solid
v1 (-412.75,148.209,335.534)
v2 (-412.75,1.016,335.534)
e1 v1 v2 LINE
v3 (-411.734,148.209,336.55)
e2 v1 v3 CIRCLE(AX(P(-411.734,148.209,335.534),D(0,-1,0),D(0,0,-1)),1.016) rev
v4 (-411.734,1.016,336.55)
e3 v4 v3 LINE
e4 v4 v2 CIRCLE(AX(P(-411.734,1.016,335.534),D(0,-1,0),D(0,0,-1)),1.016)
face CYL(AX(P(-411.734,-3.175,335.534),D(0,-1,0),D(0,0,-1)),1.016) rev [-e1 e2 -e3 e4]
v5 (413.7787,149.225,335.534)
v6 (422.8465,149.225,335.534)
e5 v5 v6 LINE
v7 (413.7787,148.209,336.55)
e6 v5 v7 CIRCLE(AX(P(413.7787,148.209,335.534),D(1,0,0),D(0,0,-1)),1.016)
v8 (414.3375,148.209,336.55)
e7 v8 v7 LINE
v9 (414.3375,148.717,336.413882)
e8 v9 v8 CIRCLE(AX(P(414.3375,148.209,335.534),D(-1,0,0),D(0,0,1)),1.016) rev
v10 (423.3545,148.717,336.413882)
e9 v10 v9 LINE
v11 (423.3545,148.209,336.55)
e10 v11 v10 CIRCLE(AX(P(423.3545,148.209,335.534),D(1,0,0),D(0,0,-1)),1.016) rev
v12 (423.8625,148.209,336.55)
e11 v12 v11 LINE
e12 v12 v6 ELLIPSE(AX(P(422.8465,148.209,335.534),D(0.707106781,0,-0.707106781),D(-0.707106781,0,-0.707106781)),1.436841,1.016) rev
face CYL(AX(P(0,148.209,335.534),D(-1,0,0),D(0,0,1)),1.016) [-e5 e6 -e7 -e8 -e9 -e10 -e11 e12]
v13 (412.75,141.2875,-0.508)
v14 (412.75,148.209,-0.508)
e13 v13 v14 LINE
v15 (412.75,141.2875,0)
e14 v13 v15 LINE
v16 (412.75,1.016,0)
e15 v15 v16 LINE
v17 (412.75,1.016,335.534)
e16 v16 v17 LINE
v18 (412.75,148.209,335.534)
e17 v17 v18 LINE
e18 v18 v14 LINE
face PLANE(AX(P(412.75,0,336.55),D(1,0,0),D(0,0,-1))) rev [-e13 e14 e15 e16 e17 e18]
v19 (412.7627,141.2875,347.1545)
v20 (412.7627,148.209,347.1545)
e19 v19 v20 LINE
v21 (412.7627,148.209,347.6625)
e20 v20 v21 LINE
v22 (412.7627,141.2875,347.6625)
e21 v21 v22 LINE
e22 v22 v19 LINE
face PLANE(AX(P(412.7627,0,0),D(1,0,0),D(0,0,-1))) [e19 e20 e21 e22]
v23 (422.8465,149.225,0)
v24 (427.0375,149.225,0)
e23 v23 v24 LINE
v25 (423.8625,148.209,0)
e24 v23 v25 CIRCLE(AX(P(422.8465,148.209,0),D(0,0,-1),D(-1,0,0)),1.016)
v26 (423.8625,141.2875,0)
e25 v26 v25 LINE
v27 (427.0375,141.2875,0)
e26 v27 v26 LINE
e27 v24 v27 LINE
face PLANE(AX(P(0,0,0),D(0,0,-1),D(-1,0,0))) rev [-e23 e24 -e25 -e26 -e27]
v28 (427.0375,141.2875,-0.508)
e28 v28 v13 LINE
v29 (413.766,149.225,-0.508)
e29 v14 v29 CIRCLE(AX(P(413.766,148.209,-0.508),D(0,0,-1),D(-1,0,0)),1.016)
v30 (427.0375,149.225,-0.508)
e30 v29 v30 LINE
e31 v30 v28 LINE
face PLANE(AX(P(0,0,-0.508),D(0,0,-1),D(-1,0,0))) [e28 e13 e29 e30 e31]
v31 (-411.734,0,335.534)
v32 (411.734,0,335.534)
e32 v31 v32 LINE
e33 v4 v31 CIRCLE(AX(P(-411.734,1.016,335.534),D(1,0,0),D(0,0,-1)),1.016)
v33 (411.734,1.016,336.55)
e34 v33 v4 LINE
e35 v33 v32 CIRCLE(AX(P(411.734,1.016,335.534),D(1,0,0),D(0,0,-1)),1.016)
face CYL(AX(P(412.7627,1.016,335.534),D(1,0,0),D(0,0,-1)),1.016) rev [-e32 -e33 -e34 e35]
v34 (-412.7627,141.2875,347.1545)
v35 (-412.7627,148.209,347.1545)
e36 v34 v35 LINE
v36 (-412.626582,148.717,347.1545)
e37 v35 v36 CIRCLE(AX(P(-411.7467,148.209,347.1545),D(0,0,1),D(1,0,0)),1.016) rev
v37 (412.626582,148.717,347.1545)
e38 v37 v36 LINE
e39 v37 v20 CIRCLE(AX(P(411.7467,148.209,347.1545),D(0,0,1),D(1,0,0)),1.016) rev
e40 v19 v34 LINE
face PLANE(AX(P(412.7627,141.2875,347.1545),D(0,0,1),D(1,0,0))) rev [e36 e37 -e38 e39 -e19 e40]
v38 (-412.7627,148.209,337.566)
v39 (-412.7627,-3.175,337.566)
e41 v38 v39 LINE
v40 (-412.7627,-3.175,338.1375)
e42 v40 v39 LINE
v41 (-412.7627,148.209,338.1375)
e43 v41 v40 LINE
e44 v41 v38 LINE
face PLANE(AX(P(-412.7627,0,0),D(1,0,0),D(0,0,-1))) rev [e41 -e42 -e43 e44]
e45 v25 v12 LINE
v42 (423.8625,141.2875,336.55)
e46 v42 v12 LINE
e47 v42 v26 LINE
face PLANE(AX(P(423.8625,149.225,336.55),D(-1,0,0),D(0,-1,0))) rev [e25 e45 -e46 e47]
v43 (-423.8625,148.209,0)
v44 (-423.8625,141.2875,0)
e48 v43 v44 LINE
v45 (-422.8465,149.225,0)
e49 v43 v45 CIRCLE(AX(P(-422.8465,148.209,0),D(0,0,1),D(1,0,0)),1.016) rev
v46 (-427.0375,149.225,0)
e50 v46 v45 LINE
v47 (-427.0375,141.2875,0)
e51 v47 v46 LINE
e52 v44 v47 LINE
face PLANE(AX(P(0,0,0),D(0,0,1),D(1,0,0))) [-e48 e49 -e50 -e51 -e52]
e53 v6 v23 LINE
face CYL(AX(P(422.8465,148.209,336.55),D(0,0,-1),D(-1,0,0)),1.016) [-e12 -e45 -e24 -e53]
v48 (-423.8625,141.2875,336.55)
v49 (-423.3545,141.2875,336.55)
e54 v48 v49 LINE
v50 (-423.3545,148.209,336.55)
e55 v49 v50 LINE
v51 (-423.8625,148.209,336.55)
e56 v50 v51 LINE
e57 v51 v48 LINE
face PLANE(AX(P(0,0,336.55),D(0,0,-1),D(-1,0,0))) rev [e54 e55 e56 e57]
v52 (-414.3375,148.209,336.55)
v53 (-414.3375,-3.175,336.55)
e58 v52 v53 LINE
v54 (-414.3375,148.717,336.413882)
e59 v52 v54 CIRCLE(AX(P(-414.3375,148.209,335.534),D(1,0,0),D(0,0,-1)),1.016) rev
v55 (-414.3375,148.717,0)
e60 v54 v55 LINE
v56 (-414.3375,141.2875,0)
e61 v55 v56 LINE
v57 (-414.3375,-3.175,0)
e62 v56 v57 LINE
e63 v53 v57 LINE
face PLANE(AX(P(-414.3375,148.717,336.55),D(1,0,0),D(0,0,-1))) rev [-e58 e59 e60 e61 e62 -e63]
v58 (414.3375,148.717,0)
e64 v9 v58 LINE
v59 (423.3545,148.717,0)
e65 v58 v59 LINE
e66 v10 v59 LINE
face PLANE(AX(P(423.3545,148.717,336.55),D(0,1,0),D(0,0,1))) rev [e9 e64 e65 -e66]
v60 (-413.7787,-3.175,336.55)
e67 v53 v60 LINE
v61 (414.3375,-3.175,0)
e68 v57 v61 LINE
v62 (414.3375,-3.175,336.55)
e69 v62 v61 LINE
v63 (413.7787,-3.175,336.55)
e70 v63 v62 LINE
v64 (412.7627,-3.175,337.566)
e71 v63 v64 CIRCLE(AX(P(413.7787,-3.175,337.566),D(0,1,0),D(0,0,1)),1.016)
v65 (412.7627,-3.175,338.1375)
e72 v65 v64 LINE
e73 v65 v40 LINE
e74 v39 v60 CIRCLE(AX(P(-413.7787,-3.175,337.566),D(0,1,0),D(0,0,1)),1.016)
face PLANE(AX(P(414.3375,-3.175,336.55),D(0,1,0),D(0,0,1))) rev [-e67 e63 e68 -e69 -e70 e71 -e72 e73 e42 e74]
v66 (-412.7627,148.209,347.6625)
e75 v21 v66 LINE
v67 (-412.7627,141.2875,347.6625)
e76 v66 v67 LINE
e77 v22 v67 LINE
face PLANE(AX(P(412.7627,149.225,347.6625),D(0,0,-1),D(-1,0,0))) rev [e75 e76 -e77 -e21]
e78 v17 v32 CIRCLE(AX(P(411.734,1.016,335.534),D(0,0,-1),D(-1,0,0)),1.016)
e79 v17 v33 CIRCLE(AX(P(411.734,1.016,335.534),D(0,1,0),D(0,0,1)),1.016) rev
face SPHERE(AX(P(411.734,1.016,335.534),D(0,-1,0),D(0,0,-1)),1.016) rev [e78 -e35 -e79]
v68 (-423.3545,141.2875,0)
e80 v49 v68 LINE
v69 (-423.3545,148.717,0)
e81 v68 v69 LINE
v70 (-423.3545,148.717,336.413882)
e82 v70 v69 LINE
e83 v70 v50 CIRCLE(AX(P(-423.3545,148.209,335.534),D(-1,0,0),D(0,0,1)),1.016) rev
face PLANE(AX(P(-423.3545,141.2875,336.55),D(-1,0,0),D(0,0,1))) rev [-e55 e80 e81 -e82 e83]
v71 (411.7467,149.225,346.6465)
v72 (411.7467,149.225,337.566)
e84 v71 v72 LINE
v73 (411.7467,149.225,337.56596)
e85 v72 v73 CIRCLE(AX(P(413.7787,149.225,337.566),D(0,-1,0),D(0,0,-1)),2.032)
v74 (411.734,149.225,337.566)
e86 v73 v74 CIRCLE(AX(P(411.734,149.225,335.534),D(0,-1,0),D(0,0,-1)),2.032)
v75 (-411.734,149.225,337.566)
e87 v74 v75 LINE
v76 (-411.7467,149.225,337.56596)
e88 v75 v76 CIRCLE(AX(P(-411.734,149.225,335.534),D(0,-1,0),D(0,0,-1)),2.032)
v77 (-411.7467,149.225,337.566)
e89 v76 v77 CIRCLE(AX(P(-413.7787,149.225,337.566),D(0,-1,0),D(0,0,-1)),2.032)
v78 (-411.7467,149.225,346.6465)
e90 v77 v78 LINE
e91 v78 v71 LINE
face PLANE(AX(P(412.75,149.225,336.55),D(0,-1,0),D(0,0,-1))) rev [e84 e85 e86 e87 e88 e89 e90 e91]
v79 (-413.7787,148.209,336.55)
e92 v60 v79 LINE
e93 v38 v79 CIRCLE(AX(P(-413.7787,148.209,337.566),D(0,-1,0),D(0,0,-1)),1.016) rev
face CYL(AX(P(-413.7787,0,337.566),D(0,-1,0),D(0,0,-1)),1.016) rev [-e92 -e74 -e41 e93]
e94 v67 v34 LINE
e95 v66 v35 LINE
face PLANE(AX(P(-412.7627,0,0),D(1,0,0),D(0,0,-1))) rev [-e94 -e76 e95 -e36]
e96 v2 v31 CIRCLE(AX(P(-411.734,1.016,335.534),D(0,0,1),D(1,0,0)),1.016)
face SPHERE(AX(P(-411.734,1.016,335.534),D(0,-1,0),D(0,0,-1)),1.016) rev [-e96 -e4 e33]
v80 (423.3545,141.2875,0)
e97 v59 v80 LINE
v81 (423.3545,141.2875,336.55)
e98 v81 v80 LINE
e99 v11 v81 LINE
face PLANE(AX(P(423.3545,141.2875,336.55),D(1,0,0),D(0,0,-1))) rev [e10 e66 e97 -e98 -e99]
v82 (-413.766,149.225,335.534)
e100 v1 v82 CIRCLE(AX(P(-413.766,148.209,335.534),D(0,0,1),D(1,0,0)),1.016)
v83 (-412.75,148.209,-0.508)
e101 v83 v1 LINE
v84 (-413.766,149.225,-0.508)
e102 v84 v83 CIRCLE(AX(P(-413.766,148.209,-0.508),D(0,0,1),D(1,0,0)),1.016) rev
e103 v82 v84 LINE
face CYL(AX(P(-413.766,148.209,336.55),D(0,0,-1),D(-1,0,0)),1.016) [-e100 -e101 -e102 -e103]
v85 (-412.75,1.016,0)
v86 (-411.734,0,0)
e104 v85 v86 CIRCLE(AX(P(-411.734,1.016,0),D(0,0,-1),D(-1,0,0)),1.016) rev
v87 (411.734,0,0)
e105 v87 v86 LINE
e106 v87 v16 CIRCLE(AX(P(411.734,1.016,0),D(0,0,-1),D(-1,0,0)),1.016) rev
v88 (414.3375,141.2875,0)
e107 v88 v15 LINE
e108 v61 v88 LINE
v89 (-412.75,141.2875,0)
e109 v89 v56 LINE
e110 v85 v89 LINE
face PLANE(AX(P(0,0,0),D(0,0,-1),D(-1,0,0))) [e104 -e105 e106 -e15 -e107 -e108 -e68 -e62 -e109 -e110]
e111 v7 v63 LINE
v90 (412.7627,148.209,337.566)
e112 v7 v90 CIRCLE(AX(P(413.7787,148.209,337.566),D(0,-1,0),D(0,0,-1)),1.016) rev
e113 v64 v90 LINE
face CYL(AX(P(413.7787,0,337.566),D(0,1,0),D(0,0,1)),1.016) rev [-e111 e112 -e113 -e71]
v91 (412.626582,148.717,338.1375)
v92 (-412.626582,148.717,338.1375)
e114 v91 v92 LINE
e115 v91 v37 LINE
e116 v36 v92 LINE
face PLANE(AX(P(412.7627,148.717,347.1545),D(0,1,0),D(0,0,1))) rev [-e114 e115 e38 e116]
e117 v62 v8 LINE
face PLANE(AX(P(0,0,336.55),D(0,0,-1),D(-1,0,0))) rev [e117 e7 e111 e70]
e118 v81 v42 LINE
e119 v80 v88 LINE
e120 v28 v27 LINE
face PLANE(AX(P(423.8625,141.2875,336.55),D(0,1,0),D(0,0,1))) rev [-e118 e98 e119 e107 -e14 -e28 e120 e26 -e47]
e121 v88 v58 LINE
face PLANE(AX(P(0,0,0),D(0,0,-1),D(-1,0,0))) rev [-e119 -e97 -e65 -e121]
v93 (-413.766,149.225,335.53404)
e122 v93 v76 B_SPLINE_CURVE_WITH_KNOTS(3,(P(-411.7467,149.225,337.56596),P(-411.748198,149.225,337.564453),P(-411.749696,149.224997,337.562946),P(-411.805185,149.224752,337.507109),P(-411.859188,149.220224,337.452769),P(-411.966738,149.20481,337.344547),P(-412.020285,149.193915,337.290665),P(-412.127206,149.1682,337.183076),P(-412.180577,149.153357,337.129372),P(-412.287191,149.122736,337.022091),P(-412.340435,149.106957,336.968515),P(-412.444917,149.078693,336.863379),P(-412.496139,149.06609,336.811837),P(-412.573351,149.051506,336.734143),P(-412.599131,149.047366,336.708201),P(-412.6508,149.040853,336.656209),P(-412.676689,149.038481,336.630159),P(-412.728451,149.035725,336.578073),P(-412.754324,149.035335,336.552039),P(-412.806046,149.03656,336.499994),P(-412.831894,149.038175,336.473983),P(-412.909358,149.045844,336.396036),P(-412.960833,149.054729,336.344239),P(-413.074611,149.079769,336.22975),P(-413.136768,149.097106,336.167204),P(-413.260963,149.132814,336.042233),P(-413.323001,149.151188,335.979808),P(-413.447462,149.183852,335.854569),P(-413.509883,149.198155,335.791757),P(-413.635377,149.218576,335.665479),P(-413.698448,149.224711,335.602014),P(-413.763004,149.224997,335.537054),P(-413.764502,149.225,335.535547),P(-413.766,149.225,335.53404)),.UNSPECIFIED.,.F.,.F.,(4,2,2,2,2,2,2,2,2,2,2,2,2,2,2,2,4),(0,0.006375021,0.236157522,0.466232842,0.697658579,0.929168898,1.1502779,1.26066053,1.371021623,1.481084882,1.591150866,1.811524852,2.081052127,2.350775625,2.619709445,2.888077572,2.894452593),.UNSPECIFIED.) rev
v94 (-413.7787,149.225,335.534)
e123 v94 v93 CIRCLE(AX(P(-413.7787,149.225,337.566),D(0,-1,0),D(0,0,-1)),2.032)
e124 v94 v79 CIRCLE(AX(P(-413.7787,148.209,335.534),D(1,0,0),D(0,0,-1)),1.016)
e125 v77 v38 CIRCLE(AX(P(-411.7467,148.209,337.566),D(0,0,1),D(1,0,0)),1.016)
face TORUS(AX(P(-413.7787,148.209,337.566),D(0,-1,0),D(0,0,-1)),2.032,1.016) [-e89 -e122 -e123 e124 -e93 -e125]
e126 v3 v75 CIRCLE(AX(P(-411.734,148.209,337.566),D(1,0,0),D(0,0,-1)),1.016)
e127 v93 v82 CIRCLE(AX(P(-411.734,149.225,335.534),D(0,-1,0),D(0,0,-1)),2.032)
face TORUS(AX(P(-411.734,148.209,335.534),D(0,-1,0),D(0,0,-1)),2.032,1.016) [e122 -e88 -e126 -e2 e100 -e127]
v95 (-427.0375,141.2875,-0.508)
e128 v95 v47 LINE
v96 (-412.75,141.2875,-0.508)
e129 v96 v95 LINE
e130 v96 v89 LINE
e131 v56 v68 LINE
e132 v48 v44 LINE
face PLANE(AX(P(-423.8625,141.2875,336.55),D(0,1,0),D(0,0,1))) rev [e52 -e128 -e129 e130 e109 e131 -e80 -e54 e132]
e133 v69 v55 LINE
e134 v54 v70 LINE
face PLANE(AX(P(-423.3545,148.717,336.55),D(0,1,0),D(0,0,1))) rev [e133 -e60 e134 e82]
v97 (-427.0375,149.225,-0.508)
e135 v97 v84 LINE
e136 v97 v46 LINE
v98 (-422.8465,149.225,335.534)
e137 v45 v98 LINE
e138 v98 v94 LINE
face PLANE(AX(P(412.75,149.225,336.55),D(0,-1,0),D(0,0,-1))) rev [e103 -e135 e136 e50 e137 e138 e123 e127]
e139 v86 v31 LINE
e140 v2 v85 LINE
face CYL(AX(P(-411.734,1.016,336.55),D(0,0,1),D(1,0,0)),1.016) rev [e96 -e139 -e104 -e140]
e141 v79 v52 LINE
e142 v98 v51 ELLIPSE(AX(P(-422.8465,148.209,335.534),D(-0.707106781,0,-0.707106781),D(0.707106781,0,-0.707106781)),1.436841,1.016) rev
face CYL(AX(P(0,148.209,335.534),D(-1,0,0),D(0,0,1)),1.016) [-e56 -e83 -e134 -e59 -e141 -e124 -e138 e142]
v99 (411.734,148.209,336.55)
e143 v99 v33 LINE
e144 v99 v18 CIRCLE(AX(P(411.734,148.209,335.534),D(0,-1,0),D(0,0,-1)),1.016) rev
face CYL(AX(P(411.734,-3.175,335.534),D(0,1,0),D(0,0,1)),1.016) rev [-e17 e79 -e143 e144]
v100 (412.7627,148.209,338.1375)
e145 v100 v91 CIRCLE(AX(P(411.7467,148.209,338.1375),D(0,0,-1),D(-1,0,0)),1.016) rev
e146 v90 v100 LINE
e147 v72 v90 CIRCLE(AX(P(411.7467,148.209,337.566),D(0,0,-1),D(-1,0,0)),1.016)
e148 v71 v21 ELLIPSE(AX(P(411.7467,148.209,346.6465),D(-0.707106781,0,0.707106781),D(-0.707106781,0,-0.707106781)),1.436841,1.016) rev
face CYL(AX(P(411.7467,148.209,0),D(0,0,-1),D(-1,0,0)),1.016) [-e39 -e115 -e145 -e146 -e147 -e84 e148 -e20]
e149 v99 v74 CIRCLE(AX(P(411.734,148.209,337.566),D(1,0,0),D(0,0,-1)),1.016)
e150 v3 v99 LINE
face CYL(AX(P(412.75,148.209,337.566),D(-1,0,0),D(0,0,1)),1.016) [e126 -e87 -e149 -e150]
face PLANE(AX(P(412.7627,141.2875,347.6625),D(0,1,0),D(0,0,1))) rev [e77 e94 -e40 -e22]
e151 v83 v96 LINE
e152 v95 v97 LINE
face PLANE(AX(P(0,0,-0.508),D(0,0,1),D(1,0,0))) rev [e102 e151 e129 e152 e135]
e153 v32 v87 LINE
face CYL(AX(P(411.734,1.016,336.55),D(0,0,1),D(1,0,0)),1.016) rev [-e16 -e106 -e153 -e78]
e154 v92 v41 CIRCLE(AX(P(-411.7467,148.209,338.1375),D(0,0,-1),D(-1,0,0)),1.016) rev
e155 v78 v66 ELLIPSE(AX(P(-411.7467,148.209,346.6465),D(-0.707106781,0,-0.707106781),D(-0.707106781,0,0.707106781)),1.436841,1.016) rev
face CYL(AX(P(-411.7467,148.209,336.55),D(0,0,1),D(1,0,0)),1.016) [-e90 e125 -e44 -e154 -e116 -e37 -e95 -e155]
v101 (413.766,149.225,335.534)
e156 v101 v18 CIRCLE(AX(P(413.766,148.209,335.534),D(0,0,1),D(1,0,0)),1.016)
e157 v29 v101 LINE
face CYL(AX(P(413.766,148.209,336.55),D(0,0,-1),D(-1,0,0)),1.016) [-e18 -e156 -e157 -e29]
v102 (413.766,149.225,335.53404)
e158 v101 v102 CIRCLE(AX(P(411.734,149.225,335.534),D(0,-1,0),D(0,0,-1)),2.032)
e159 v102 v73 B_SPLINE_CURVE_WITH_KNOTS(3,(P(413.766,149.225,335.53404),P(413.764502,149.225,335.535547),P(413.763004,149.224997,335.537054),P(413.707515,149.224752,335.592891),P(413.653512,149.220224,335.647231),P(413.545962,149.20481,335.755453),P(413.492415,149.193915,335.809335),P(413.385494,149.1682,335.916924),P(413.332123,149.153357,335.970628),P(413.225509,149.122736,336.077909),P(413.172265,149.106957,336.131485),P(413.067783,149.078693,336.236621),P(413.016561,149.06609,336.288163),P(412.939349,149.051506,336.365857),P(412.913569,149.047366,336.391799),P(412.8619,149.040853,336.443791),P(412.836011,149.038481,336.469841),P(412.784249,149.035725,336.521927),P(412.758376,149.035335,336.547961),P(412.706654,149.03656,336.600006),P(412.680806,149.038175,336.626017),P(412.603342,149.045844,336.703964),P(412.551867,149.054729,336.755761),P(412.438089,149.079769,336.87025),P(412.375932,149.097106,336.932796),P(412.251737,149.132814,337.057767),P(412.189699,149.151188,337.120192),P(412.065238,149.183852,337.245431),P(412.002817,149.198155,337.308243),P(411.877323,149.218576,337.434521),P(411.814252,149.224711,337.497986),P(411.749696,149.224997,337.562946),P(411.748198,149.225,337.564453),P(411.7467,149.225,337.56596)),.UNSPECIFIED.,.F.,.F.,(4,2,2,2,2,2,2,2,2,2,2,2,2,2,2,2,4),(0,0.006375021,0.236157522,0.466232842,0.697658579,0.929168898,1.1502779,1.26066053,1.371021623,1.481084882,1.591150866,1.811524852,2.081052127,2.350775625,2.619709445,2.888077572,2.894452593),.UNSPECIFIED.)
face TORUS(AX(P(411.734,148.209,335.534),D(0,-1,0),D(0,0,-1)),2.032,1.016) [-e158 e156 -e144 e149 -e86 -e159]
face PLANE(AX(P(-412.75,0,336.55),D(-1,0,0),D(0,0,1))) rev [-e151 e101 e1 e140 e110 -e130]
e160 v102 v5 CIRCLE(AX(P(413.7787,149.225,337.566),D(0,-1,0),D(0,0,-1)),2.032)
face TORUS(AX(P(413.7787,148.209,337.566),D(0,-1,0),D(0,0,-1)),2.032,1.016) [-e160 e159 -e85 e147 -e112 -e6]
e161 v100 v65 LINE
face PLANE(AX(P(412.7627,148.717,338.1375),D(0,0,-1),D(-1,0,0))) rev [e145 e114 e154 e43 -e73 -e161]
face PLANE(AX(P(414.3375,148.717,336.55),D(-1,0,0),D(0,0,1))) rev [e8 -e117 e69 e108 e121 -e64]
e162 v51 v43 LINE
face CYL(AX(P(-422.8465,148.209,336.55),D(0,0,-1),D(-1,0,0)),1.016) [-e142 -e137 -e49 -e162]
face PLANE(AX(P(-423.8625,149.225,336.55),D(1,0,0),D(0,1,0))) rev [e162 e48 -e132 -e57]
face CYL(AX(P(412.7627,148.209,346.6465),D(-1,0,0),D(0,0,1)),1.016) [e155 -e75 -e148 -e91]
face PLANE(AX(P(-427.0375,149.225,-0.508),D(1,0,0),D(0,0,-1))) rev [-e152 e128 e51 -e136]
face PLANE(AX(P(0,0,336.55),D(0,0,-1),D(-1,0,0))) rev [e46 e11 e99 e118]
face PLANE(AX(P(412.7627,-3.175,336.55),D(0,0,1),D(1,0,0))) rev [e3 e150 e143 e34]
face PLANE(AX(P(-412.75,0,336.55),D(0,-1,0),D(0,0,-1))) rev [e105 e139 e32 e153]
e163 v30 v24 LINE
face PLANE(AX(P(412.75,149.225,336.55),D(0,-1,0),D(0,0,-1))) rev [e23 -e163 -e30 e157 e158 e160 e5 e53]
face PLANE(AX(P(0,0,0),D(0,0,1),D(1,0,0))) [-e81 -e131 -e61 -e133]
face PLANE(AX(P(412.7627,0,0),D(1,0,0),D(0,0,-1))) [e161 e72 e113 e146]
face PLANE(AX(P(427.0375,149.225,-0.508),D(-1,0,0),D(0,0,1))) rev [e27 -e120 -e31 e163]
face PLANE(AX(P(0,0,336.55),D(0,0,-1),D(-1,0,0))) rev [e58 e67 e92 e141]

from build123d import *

# Parameters (mm, degrees)
BOSS_EXTRUDE1_DEPTH = 336.55
SKETCH2_W           = 14.2875
SKETCH2_H           = 7.9375
BOSS_EXTRUDE2_DEPTH = 0.508
BOSS_EXTRUDE6_DEPTH = 412.7627
FILLET1_R           = 1.016
FILLET2_R           = 1.016
FILLET3_R           = 1.016
FILLET4_R           = 1.016
FILLET5_R           = 1.016


with BuildPart() as part:
    # Sketch1 → Boss-Extrude1 (new body)
    with BuildSketch(Plane.XY):
        Polygon((-412.75, 0), (412.75, 0), (412.75, 149.225), (423.8625, 149.225), (423.8625, 141.2875), (423.3545, 141.2875), (423.3545, 148.717), (414.3375, 148.717), (414.3375, -3.175), (-414.3375, -3.175), (-414.3375, 148.717), (-423.3545, 148.717), (-423.3545, 141.2875), (-423.8625, 141.2875), (-423.8625, 149.225), (-412.75, 149.225), align=None)
    extrude(amount=BOSS_EXTRUDE1_DEPTH)

    # Sketch2 → Boss-Extrude2 (add)
    with BuildSketch(Plane(origin=(0, 0, 0), x_dir=(-1, 0, 0), z_dir=(0, 0, -1))):
        with Locations((-419.89375, 145.25625)):
            Rectangle(SKETCH2_W, SKETCH2_H)
        with Locations((419.89375, 145.25625)):
            Rectangle(SKETCH2_W, SKETCH2_H)
    extrude(amount=BOSS_EXTRUDE2_DEPTH)

    # Sketch3 → Boss-Extrude6 (add, symmetric)
    with BuildSketch(Plane(origin=(0, 0, 0), x_dir=(0, 0, -1), z_dir=(1, 0, 0))):
        Polygon((-336.55, -3.175), (-336.55, 149.225), (-347.6625, 149.225), (-347.6625, 141.2875), (-347.1545, 141.2875), (-347.1545, 148.717), (-338.1375, 148.717), (-338.1375, -3.175), align=None)
    extrude(amount=BOSS_EXTRUDE6_DEPTH, both=True)

    # Fillet1
    fillet1_edges = [part.edges().sort_by_distance(p)[0] for p in [
        (412.75, 74.6125, 336.55),
    ]]
    fillet(fillet1_edges, radius=FILLET1_R)

    # Fillet2
    fillet2_edges = [part.edges().sort_by_distance(p)[0] for p in [
        (412.7627, 73.025, 336.55),
    ]]
    fillet(fillet2_edges, radius=FILLET2_R)

    # Fillet3
    fillet3_edges = [part.edges().sort_by_distance(p)[0] for p in [
        (-412.75, 74.6125, 336.55),
        (-412.7627, 73.025, 336.55),
    ]]
    fillet(fillet3_edges, radius=FILLET3_R)

    # Fillet4
    fillet4_edges = [part.edges().sort_by_distance(p)[0] for p in [
        (0, 0, 336.55),
        (412.75, 0, 167.767),
        (412.45242049, 0, 336.25242049),
        (-412.75, 0, 167.767),
        (-412.45242049, 0, 336.25242049),
    ]]
    fillet(fillet4_edges, radius=FILLET4_R)

    # Fillet5
    # the kernel refuses this fillet: 1.016 mm, written as the material it takes off along each edge
    with BuildSketch(Plane(origin=(413.7787, 149.225, 336.55), x_dir=(0, 0, -1), z_dir=(1, 0, 0)), Plane(origin=(-426.4025, 149.225, 336.55), x_dir=(0, 0, -1), z_dir=(1, 0, 0))) as fillet5_piece_1:
        with BuildLine():
            CenterArc((FILLET5_R, -FILLET5_R), FILLET5_R, 90, 90)
            Line((0, -FILLET5_R), (0, 0))
            Line((0, 0), (FILLET5_R, 0))
        make_face()
    fillet5_piece_1_solid = extrude(amount=12.6238, mode=Mode.PRIVATE)
    with BuildSketch(Plane(origin=(413.7787, 149.225, 337.566), x_dir=(0, 0, -1), z_dir=(1, 0, 0))) as fillet5_piece_2:
        with BuildLine():
            CenterArc((1.016 + FILLET5_R, -FILLET5_R), FILLET5_R, 90, 90)
            Line((1.016, -FILLET5_R), (1.016, 0))
            Line((1.016, 0), (1.016 + FILLET5_R, 0))
        make_face()
    fillet5_piece_2_solid = revolve(axis=Axis((413.7787, 149.225, 337.566), (0, 1, 0)), revolution_arc=90, mode=Mode.PRIVATE)
    with BuildSketch(Plane(origin=(-413.7787, 149.225, 337.566), x_dir=(1, 0, 0), z_dir=(0, 0, 1))) as fillet5_piece_3:
        with BuildLine():
            CenterArc((1.016 + FILLET5_R, -FILLET5_R), FILLET5_R, 90, 90)
            Line((1.016, -FILLET5_R), (1.016, 0))
            Line((1.016, 0), (1.016 + FILLET5_R, 0))
        make_face()
    fillet5_piece_3_solid = revolve(axis=Axis((-413.7787, 149.225, 337.566), (0, 1, 0)), revolution_arc=90, mode=Mode.PRIVATE)
    with BuildSketch(Plane(origin=(-412.75, 149.225, -3.048), x_dir=(0, -1, 0), z_dir=(0, 0, 1))) as fillet5_piece_4:
        with BuildLine():
            CenterArc((FILLET5_R, -FILLET5_R), FILLET5_R, 90, 90)
            Line((0, -FILLET5_R), (0, 0))
            Line((0, 0), (FILLET5_R, 0))
        make_face()
    fillet5_piece_4_solid = extrude(amount=338.582, mode=Mode.PRIVATE)
    with BuildSketch(Plane(origin=(-411.734, 149.225, 335.534), x_dir=(0, 0, 1), z_dir=(1, 0, 0))) as fillet5_piece_5:
        with BuildLine():
            CenterArc((1.016 + FILLET5_R, FILLET5_R), FILLET5_R, 180, 90)
            Line((1.016 + FILLET5_R, 0), (1.016, 0))
            Line((1.016, 0), (1.016, FILLET5_R))
        make_face()
    fillet5_piece_5_solid = revolve(axis=Axis((-411.734, 149.225, 335.534), (0, -1, 0)), revolution_arc=90, mode=Mode.PRIVATE)
    with BuildSketch(Plane(origin=(-411.734, 149.225, 336.55), x_dir=(0, 0, 1), z_dir=(1, 0, 0))) as fillet5_piece_6:
        with BuildLine():
            CenterArc((FILLET5_R, FILLET5_R), FILLET5_R, 180, 90)
            Line((0, FILLET5_R), (0, 0))
            Line((0, 0), (FILLET5_R, 0))
        make_face()
    fillet5_piece_6_solid = extrude(amount=823.468, mode=Mode.PRIVATE)
    with BuildSketch(Plane(origin=(411.734, 149.225, 335.534), x_dir=(1, 0, 0), z_dir=(0, 0, -1))) as fillet5_piece_7:
        with BuildLine():
            CenterArc((1.016 + FILLET5_R, FILLET5_R), FILLET5_R, 180, 90)
            Line((1.016, FILLET5_R), (1.016, 0))
            Line((1.016, 0), (1.016 + FILLET5_R, 0))
        make_face()
    fillet5_piece_7_solid = revolve(axis=Axis((411.734, 149.225, 335.534), (0, -1, 0)), revolution_arc=90, mode=Mode.PRIVATE)
    with BuildSketch(Plane(origin=(412.7627, 149.225, 337.566), x_dir=(-1, 0, 0), z_dir=(0, 0, 1))) as fillet5_piece_8:
        with BuildLine():
            CenterArc((FILLET5_R, FILLET5_R), FILLET5_R, 180, 90)
            Line((0, FILLET5_R), (0, 0))
            Line((0, 0), (FILLET5_R, 0))
        make_face()
    fillet5_piece_8_solid = extrude(amount=12.6365, mode=Mode.PRIVATE)
    with BuildSketch(Plane(origin=(-412.7627, 149.225, 337.566), x_dir=(1, 0, 0), z_dir=(0, 0, 1))) as fillet5_piece_9:
        with BuildLine():
            CenterArc((FILLET5_R, -FILLET5_R), FILLET5_R, 90, 90)
            Line((0, -FILLET5_R), (0, 0))
            Line((0, 0), (FILLET5_R, 0))
        make_face()
    fillet5_piece_9_solid = extrude(amount=12.6365, mode=Mode.PRIVATE)
    with BuildSketch(Plane(origin=(-415.3027, 149.225, 347.6625), x_dir=(0, 0, -1), z_dir=(1, 0, 0))) as fillet5_piece_10:
        with BuildLine():
            CenterArc((FILLET5_R, -FILLET5_R), FILLET5_R, 90, 90)
            Line((0, -FILLET5_R), (0, 0))
            Line((0, 0), (FILLET5_R, 0))
        make_face()
    fillet5_piece_10_solid = extrude(amount=830.6054, mode=Mode.PRIVATE)
    with BuildSketch(Plane(origin=(-423.8625, 149.225, 0), x_dir=(1, 0, 0), z_dir=(0, 0, 1))) as fillet5_piece_11:
        with BuildLine():
            CenterArc((FILLET5_R, -FILLET5_R), FILLET5_R, 90, 90)
            Line((0, -FILLET5_R), (0, 0))
            Line((0, 0), (FILLET5_R, 0))
        make_face()
    fillet5_piece_11_solid = extrude(amount=339.09, mode=Mode.PRIVATE)
    with BuildSketch(Plane(origin=(412.75, 149.225, 335.534), x_dir=(1, 0, 0), z_dir=(0, 0, -1))) as fillet5_piece_12:
        with BuildLine():
            CenterArc((FILLET5_R, FILLET5_R), FILLET5_R, 180, 90)
            Line((0, FILLET5_R), (0, 0))
            Line((0, 0), (FILLET5_R, 0))
        make_face()
    fillet5_piece_12_solid = extrude(amount=338.582, mode=Mode.PRIVATE)
    with BuildSketch(Plane(origin=(423.8625, 149.225, 0), x_dir=(-1, 0, 0), z_dir=(0, 0, 1))) as fillet5_piece_13:
        with BuildLine():
            CenterArc((FILLET5_R, FILLET5_R), FILLET5_R, 180, 90)
            Line((0, FILLET5_R), (0, 0))
            Line((0, 0), (FILLET5_R, 0))
        make_face()
    fillet5_piece_13_solid = extrude(amount=339.09, mode=Mode.PRIVATE)
    add([fillet5_piece_1_solid, fillet5_piece_2_solid, fillet5_piece_3_solid, fillet5_piece_4_solid, fillet5_piece_5_solid, fillet5_piece_6_solid, fillet5_piece_7_solid, fillet5_piece_8_solid, fillet5_piece_9_solid, fillet5_piece_10_solid, fillet5_piece_11_solid, fillet5_piece_12_solid, fillet5_piece_13_solid], mode=Mode.SUBTRACT)


solid = part.part
